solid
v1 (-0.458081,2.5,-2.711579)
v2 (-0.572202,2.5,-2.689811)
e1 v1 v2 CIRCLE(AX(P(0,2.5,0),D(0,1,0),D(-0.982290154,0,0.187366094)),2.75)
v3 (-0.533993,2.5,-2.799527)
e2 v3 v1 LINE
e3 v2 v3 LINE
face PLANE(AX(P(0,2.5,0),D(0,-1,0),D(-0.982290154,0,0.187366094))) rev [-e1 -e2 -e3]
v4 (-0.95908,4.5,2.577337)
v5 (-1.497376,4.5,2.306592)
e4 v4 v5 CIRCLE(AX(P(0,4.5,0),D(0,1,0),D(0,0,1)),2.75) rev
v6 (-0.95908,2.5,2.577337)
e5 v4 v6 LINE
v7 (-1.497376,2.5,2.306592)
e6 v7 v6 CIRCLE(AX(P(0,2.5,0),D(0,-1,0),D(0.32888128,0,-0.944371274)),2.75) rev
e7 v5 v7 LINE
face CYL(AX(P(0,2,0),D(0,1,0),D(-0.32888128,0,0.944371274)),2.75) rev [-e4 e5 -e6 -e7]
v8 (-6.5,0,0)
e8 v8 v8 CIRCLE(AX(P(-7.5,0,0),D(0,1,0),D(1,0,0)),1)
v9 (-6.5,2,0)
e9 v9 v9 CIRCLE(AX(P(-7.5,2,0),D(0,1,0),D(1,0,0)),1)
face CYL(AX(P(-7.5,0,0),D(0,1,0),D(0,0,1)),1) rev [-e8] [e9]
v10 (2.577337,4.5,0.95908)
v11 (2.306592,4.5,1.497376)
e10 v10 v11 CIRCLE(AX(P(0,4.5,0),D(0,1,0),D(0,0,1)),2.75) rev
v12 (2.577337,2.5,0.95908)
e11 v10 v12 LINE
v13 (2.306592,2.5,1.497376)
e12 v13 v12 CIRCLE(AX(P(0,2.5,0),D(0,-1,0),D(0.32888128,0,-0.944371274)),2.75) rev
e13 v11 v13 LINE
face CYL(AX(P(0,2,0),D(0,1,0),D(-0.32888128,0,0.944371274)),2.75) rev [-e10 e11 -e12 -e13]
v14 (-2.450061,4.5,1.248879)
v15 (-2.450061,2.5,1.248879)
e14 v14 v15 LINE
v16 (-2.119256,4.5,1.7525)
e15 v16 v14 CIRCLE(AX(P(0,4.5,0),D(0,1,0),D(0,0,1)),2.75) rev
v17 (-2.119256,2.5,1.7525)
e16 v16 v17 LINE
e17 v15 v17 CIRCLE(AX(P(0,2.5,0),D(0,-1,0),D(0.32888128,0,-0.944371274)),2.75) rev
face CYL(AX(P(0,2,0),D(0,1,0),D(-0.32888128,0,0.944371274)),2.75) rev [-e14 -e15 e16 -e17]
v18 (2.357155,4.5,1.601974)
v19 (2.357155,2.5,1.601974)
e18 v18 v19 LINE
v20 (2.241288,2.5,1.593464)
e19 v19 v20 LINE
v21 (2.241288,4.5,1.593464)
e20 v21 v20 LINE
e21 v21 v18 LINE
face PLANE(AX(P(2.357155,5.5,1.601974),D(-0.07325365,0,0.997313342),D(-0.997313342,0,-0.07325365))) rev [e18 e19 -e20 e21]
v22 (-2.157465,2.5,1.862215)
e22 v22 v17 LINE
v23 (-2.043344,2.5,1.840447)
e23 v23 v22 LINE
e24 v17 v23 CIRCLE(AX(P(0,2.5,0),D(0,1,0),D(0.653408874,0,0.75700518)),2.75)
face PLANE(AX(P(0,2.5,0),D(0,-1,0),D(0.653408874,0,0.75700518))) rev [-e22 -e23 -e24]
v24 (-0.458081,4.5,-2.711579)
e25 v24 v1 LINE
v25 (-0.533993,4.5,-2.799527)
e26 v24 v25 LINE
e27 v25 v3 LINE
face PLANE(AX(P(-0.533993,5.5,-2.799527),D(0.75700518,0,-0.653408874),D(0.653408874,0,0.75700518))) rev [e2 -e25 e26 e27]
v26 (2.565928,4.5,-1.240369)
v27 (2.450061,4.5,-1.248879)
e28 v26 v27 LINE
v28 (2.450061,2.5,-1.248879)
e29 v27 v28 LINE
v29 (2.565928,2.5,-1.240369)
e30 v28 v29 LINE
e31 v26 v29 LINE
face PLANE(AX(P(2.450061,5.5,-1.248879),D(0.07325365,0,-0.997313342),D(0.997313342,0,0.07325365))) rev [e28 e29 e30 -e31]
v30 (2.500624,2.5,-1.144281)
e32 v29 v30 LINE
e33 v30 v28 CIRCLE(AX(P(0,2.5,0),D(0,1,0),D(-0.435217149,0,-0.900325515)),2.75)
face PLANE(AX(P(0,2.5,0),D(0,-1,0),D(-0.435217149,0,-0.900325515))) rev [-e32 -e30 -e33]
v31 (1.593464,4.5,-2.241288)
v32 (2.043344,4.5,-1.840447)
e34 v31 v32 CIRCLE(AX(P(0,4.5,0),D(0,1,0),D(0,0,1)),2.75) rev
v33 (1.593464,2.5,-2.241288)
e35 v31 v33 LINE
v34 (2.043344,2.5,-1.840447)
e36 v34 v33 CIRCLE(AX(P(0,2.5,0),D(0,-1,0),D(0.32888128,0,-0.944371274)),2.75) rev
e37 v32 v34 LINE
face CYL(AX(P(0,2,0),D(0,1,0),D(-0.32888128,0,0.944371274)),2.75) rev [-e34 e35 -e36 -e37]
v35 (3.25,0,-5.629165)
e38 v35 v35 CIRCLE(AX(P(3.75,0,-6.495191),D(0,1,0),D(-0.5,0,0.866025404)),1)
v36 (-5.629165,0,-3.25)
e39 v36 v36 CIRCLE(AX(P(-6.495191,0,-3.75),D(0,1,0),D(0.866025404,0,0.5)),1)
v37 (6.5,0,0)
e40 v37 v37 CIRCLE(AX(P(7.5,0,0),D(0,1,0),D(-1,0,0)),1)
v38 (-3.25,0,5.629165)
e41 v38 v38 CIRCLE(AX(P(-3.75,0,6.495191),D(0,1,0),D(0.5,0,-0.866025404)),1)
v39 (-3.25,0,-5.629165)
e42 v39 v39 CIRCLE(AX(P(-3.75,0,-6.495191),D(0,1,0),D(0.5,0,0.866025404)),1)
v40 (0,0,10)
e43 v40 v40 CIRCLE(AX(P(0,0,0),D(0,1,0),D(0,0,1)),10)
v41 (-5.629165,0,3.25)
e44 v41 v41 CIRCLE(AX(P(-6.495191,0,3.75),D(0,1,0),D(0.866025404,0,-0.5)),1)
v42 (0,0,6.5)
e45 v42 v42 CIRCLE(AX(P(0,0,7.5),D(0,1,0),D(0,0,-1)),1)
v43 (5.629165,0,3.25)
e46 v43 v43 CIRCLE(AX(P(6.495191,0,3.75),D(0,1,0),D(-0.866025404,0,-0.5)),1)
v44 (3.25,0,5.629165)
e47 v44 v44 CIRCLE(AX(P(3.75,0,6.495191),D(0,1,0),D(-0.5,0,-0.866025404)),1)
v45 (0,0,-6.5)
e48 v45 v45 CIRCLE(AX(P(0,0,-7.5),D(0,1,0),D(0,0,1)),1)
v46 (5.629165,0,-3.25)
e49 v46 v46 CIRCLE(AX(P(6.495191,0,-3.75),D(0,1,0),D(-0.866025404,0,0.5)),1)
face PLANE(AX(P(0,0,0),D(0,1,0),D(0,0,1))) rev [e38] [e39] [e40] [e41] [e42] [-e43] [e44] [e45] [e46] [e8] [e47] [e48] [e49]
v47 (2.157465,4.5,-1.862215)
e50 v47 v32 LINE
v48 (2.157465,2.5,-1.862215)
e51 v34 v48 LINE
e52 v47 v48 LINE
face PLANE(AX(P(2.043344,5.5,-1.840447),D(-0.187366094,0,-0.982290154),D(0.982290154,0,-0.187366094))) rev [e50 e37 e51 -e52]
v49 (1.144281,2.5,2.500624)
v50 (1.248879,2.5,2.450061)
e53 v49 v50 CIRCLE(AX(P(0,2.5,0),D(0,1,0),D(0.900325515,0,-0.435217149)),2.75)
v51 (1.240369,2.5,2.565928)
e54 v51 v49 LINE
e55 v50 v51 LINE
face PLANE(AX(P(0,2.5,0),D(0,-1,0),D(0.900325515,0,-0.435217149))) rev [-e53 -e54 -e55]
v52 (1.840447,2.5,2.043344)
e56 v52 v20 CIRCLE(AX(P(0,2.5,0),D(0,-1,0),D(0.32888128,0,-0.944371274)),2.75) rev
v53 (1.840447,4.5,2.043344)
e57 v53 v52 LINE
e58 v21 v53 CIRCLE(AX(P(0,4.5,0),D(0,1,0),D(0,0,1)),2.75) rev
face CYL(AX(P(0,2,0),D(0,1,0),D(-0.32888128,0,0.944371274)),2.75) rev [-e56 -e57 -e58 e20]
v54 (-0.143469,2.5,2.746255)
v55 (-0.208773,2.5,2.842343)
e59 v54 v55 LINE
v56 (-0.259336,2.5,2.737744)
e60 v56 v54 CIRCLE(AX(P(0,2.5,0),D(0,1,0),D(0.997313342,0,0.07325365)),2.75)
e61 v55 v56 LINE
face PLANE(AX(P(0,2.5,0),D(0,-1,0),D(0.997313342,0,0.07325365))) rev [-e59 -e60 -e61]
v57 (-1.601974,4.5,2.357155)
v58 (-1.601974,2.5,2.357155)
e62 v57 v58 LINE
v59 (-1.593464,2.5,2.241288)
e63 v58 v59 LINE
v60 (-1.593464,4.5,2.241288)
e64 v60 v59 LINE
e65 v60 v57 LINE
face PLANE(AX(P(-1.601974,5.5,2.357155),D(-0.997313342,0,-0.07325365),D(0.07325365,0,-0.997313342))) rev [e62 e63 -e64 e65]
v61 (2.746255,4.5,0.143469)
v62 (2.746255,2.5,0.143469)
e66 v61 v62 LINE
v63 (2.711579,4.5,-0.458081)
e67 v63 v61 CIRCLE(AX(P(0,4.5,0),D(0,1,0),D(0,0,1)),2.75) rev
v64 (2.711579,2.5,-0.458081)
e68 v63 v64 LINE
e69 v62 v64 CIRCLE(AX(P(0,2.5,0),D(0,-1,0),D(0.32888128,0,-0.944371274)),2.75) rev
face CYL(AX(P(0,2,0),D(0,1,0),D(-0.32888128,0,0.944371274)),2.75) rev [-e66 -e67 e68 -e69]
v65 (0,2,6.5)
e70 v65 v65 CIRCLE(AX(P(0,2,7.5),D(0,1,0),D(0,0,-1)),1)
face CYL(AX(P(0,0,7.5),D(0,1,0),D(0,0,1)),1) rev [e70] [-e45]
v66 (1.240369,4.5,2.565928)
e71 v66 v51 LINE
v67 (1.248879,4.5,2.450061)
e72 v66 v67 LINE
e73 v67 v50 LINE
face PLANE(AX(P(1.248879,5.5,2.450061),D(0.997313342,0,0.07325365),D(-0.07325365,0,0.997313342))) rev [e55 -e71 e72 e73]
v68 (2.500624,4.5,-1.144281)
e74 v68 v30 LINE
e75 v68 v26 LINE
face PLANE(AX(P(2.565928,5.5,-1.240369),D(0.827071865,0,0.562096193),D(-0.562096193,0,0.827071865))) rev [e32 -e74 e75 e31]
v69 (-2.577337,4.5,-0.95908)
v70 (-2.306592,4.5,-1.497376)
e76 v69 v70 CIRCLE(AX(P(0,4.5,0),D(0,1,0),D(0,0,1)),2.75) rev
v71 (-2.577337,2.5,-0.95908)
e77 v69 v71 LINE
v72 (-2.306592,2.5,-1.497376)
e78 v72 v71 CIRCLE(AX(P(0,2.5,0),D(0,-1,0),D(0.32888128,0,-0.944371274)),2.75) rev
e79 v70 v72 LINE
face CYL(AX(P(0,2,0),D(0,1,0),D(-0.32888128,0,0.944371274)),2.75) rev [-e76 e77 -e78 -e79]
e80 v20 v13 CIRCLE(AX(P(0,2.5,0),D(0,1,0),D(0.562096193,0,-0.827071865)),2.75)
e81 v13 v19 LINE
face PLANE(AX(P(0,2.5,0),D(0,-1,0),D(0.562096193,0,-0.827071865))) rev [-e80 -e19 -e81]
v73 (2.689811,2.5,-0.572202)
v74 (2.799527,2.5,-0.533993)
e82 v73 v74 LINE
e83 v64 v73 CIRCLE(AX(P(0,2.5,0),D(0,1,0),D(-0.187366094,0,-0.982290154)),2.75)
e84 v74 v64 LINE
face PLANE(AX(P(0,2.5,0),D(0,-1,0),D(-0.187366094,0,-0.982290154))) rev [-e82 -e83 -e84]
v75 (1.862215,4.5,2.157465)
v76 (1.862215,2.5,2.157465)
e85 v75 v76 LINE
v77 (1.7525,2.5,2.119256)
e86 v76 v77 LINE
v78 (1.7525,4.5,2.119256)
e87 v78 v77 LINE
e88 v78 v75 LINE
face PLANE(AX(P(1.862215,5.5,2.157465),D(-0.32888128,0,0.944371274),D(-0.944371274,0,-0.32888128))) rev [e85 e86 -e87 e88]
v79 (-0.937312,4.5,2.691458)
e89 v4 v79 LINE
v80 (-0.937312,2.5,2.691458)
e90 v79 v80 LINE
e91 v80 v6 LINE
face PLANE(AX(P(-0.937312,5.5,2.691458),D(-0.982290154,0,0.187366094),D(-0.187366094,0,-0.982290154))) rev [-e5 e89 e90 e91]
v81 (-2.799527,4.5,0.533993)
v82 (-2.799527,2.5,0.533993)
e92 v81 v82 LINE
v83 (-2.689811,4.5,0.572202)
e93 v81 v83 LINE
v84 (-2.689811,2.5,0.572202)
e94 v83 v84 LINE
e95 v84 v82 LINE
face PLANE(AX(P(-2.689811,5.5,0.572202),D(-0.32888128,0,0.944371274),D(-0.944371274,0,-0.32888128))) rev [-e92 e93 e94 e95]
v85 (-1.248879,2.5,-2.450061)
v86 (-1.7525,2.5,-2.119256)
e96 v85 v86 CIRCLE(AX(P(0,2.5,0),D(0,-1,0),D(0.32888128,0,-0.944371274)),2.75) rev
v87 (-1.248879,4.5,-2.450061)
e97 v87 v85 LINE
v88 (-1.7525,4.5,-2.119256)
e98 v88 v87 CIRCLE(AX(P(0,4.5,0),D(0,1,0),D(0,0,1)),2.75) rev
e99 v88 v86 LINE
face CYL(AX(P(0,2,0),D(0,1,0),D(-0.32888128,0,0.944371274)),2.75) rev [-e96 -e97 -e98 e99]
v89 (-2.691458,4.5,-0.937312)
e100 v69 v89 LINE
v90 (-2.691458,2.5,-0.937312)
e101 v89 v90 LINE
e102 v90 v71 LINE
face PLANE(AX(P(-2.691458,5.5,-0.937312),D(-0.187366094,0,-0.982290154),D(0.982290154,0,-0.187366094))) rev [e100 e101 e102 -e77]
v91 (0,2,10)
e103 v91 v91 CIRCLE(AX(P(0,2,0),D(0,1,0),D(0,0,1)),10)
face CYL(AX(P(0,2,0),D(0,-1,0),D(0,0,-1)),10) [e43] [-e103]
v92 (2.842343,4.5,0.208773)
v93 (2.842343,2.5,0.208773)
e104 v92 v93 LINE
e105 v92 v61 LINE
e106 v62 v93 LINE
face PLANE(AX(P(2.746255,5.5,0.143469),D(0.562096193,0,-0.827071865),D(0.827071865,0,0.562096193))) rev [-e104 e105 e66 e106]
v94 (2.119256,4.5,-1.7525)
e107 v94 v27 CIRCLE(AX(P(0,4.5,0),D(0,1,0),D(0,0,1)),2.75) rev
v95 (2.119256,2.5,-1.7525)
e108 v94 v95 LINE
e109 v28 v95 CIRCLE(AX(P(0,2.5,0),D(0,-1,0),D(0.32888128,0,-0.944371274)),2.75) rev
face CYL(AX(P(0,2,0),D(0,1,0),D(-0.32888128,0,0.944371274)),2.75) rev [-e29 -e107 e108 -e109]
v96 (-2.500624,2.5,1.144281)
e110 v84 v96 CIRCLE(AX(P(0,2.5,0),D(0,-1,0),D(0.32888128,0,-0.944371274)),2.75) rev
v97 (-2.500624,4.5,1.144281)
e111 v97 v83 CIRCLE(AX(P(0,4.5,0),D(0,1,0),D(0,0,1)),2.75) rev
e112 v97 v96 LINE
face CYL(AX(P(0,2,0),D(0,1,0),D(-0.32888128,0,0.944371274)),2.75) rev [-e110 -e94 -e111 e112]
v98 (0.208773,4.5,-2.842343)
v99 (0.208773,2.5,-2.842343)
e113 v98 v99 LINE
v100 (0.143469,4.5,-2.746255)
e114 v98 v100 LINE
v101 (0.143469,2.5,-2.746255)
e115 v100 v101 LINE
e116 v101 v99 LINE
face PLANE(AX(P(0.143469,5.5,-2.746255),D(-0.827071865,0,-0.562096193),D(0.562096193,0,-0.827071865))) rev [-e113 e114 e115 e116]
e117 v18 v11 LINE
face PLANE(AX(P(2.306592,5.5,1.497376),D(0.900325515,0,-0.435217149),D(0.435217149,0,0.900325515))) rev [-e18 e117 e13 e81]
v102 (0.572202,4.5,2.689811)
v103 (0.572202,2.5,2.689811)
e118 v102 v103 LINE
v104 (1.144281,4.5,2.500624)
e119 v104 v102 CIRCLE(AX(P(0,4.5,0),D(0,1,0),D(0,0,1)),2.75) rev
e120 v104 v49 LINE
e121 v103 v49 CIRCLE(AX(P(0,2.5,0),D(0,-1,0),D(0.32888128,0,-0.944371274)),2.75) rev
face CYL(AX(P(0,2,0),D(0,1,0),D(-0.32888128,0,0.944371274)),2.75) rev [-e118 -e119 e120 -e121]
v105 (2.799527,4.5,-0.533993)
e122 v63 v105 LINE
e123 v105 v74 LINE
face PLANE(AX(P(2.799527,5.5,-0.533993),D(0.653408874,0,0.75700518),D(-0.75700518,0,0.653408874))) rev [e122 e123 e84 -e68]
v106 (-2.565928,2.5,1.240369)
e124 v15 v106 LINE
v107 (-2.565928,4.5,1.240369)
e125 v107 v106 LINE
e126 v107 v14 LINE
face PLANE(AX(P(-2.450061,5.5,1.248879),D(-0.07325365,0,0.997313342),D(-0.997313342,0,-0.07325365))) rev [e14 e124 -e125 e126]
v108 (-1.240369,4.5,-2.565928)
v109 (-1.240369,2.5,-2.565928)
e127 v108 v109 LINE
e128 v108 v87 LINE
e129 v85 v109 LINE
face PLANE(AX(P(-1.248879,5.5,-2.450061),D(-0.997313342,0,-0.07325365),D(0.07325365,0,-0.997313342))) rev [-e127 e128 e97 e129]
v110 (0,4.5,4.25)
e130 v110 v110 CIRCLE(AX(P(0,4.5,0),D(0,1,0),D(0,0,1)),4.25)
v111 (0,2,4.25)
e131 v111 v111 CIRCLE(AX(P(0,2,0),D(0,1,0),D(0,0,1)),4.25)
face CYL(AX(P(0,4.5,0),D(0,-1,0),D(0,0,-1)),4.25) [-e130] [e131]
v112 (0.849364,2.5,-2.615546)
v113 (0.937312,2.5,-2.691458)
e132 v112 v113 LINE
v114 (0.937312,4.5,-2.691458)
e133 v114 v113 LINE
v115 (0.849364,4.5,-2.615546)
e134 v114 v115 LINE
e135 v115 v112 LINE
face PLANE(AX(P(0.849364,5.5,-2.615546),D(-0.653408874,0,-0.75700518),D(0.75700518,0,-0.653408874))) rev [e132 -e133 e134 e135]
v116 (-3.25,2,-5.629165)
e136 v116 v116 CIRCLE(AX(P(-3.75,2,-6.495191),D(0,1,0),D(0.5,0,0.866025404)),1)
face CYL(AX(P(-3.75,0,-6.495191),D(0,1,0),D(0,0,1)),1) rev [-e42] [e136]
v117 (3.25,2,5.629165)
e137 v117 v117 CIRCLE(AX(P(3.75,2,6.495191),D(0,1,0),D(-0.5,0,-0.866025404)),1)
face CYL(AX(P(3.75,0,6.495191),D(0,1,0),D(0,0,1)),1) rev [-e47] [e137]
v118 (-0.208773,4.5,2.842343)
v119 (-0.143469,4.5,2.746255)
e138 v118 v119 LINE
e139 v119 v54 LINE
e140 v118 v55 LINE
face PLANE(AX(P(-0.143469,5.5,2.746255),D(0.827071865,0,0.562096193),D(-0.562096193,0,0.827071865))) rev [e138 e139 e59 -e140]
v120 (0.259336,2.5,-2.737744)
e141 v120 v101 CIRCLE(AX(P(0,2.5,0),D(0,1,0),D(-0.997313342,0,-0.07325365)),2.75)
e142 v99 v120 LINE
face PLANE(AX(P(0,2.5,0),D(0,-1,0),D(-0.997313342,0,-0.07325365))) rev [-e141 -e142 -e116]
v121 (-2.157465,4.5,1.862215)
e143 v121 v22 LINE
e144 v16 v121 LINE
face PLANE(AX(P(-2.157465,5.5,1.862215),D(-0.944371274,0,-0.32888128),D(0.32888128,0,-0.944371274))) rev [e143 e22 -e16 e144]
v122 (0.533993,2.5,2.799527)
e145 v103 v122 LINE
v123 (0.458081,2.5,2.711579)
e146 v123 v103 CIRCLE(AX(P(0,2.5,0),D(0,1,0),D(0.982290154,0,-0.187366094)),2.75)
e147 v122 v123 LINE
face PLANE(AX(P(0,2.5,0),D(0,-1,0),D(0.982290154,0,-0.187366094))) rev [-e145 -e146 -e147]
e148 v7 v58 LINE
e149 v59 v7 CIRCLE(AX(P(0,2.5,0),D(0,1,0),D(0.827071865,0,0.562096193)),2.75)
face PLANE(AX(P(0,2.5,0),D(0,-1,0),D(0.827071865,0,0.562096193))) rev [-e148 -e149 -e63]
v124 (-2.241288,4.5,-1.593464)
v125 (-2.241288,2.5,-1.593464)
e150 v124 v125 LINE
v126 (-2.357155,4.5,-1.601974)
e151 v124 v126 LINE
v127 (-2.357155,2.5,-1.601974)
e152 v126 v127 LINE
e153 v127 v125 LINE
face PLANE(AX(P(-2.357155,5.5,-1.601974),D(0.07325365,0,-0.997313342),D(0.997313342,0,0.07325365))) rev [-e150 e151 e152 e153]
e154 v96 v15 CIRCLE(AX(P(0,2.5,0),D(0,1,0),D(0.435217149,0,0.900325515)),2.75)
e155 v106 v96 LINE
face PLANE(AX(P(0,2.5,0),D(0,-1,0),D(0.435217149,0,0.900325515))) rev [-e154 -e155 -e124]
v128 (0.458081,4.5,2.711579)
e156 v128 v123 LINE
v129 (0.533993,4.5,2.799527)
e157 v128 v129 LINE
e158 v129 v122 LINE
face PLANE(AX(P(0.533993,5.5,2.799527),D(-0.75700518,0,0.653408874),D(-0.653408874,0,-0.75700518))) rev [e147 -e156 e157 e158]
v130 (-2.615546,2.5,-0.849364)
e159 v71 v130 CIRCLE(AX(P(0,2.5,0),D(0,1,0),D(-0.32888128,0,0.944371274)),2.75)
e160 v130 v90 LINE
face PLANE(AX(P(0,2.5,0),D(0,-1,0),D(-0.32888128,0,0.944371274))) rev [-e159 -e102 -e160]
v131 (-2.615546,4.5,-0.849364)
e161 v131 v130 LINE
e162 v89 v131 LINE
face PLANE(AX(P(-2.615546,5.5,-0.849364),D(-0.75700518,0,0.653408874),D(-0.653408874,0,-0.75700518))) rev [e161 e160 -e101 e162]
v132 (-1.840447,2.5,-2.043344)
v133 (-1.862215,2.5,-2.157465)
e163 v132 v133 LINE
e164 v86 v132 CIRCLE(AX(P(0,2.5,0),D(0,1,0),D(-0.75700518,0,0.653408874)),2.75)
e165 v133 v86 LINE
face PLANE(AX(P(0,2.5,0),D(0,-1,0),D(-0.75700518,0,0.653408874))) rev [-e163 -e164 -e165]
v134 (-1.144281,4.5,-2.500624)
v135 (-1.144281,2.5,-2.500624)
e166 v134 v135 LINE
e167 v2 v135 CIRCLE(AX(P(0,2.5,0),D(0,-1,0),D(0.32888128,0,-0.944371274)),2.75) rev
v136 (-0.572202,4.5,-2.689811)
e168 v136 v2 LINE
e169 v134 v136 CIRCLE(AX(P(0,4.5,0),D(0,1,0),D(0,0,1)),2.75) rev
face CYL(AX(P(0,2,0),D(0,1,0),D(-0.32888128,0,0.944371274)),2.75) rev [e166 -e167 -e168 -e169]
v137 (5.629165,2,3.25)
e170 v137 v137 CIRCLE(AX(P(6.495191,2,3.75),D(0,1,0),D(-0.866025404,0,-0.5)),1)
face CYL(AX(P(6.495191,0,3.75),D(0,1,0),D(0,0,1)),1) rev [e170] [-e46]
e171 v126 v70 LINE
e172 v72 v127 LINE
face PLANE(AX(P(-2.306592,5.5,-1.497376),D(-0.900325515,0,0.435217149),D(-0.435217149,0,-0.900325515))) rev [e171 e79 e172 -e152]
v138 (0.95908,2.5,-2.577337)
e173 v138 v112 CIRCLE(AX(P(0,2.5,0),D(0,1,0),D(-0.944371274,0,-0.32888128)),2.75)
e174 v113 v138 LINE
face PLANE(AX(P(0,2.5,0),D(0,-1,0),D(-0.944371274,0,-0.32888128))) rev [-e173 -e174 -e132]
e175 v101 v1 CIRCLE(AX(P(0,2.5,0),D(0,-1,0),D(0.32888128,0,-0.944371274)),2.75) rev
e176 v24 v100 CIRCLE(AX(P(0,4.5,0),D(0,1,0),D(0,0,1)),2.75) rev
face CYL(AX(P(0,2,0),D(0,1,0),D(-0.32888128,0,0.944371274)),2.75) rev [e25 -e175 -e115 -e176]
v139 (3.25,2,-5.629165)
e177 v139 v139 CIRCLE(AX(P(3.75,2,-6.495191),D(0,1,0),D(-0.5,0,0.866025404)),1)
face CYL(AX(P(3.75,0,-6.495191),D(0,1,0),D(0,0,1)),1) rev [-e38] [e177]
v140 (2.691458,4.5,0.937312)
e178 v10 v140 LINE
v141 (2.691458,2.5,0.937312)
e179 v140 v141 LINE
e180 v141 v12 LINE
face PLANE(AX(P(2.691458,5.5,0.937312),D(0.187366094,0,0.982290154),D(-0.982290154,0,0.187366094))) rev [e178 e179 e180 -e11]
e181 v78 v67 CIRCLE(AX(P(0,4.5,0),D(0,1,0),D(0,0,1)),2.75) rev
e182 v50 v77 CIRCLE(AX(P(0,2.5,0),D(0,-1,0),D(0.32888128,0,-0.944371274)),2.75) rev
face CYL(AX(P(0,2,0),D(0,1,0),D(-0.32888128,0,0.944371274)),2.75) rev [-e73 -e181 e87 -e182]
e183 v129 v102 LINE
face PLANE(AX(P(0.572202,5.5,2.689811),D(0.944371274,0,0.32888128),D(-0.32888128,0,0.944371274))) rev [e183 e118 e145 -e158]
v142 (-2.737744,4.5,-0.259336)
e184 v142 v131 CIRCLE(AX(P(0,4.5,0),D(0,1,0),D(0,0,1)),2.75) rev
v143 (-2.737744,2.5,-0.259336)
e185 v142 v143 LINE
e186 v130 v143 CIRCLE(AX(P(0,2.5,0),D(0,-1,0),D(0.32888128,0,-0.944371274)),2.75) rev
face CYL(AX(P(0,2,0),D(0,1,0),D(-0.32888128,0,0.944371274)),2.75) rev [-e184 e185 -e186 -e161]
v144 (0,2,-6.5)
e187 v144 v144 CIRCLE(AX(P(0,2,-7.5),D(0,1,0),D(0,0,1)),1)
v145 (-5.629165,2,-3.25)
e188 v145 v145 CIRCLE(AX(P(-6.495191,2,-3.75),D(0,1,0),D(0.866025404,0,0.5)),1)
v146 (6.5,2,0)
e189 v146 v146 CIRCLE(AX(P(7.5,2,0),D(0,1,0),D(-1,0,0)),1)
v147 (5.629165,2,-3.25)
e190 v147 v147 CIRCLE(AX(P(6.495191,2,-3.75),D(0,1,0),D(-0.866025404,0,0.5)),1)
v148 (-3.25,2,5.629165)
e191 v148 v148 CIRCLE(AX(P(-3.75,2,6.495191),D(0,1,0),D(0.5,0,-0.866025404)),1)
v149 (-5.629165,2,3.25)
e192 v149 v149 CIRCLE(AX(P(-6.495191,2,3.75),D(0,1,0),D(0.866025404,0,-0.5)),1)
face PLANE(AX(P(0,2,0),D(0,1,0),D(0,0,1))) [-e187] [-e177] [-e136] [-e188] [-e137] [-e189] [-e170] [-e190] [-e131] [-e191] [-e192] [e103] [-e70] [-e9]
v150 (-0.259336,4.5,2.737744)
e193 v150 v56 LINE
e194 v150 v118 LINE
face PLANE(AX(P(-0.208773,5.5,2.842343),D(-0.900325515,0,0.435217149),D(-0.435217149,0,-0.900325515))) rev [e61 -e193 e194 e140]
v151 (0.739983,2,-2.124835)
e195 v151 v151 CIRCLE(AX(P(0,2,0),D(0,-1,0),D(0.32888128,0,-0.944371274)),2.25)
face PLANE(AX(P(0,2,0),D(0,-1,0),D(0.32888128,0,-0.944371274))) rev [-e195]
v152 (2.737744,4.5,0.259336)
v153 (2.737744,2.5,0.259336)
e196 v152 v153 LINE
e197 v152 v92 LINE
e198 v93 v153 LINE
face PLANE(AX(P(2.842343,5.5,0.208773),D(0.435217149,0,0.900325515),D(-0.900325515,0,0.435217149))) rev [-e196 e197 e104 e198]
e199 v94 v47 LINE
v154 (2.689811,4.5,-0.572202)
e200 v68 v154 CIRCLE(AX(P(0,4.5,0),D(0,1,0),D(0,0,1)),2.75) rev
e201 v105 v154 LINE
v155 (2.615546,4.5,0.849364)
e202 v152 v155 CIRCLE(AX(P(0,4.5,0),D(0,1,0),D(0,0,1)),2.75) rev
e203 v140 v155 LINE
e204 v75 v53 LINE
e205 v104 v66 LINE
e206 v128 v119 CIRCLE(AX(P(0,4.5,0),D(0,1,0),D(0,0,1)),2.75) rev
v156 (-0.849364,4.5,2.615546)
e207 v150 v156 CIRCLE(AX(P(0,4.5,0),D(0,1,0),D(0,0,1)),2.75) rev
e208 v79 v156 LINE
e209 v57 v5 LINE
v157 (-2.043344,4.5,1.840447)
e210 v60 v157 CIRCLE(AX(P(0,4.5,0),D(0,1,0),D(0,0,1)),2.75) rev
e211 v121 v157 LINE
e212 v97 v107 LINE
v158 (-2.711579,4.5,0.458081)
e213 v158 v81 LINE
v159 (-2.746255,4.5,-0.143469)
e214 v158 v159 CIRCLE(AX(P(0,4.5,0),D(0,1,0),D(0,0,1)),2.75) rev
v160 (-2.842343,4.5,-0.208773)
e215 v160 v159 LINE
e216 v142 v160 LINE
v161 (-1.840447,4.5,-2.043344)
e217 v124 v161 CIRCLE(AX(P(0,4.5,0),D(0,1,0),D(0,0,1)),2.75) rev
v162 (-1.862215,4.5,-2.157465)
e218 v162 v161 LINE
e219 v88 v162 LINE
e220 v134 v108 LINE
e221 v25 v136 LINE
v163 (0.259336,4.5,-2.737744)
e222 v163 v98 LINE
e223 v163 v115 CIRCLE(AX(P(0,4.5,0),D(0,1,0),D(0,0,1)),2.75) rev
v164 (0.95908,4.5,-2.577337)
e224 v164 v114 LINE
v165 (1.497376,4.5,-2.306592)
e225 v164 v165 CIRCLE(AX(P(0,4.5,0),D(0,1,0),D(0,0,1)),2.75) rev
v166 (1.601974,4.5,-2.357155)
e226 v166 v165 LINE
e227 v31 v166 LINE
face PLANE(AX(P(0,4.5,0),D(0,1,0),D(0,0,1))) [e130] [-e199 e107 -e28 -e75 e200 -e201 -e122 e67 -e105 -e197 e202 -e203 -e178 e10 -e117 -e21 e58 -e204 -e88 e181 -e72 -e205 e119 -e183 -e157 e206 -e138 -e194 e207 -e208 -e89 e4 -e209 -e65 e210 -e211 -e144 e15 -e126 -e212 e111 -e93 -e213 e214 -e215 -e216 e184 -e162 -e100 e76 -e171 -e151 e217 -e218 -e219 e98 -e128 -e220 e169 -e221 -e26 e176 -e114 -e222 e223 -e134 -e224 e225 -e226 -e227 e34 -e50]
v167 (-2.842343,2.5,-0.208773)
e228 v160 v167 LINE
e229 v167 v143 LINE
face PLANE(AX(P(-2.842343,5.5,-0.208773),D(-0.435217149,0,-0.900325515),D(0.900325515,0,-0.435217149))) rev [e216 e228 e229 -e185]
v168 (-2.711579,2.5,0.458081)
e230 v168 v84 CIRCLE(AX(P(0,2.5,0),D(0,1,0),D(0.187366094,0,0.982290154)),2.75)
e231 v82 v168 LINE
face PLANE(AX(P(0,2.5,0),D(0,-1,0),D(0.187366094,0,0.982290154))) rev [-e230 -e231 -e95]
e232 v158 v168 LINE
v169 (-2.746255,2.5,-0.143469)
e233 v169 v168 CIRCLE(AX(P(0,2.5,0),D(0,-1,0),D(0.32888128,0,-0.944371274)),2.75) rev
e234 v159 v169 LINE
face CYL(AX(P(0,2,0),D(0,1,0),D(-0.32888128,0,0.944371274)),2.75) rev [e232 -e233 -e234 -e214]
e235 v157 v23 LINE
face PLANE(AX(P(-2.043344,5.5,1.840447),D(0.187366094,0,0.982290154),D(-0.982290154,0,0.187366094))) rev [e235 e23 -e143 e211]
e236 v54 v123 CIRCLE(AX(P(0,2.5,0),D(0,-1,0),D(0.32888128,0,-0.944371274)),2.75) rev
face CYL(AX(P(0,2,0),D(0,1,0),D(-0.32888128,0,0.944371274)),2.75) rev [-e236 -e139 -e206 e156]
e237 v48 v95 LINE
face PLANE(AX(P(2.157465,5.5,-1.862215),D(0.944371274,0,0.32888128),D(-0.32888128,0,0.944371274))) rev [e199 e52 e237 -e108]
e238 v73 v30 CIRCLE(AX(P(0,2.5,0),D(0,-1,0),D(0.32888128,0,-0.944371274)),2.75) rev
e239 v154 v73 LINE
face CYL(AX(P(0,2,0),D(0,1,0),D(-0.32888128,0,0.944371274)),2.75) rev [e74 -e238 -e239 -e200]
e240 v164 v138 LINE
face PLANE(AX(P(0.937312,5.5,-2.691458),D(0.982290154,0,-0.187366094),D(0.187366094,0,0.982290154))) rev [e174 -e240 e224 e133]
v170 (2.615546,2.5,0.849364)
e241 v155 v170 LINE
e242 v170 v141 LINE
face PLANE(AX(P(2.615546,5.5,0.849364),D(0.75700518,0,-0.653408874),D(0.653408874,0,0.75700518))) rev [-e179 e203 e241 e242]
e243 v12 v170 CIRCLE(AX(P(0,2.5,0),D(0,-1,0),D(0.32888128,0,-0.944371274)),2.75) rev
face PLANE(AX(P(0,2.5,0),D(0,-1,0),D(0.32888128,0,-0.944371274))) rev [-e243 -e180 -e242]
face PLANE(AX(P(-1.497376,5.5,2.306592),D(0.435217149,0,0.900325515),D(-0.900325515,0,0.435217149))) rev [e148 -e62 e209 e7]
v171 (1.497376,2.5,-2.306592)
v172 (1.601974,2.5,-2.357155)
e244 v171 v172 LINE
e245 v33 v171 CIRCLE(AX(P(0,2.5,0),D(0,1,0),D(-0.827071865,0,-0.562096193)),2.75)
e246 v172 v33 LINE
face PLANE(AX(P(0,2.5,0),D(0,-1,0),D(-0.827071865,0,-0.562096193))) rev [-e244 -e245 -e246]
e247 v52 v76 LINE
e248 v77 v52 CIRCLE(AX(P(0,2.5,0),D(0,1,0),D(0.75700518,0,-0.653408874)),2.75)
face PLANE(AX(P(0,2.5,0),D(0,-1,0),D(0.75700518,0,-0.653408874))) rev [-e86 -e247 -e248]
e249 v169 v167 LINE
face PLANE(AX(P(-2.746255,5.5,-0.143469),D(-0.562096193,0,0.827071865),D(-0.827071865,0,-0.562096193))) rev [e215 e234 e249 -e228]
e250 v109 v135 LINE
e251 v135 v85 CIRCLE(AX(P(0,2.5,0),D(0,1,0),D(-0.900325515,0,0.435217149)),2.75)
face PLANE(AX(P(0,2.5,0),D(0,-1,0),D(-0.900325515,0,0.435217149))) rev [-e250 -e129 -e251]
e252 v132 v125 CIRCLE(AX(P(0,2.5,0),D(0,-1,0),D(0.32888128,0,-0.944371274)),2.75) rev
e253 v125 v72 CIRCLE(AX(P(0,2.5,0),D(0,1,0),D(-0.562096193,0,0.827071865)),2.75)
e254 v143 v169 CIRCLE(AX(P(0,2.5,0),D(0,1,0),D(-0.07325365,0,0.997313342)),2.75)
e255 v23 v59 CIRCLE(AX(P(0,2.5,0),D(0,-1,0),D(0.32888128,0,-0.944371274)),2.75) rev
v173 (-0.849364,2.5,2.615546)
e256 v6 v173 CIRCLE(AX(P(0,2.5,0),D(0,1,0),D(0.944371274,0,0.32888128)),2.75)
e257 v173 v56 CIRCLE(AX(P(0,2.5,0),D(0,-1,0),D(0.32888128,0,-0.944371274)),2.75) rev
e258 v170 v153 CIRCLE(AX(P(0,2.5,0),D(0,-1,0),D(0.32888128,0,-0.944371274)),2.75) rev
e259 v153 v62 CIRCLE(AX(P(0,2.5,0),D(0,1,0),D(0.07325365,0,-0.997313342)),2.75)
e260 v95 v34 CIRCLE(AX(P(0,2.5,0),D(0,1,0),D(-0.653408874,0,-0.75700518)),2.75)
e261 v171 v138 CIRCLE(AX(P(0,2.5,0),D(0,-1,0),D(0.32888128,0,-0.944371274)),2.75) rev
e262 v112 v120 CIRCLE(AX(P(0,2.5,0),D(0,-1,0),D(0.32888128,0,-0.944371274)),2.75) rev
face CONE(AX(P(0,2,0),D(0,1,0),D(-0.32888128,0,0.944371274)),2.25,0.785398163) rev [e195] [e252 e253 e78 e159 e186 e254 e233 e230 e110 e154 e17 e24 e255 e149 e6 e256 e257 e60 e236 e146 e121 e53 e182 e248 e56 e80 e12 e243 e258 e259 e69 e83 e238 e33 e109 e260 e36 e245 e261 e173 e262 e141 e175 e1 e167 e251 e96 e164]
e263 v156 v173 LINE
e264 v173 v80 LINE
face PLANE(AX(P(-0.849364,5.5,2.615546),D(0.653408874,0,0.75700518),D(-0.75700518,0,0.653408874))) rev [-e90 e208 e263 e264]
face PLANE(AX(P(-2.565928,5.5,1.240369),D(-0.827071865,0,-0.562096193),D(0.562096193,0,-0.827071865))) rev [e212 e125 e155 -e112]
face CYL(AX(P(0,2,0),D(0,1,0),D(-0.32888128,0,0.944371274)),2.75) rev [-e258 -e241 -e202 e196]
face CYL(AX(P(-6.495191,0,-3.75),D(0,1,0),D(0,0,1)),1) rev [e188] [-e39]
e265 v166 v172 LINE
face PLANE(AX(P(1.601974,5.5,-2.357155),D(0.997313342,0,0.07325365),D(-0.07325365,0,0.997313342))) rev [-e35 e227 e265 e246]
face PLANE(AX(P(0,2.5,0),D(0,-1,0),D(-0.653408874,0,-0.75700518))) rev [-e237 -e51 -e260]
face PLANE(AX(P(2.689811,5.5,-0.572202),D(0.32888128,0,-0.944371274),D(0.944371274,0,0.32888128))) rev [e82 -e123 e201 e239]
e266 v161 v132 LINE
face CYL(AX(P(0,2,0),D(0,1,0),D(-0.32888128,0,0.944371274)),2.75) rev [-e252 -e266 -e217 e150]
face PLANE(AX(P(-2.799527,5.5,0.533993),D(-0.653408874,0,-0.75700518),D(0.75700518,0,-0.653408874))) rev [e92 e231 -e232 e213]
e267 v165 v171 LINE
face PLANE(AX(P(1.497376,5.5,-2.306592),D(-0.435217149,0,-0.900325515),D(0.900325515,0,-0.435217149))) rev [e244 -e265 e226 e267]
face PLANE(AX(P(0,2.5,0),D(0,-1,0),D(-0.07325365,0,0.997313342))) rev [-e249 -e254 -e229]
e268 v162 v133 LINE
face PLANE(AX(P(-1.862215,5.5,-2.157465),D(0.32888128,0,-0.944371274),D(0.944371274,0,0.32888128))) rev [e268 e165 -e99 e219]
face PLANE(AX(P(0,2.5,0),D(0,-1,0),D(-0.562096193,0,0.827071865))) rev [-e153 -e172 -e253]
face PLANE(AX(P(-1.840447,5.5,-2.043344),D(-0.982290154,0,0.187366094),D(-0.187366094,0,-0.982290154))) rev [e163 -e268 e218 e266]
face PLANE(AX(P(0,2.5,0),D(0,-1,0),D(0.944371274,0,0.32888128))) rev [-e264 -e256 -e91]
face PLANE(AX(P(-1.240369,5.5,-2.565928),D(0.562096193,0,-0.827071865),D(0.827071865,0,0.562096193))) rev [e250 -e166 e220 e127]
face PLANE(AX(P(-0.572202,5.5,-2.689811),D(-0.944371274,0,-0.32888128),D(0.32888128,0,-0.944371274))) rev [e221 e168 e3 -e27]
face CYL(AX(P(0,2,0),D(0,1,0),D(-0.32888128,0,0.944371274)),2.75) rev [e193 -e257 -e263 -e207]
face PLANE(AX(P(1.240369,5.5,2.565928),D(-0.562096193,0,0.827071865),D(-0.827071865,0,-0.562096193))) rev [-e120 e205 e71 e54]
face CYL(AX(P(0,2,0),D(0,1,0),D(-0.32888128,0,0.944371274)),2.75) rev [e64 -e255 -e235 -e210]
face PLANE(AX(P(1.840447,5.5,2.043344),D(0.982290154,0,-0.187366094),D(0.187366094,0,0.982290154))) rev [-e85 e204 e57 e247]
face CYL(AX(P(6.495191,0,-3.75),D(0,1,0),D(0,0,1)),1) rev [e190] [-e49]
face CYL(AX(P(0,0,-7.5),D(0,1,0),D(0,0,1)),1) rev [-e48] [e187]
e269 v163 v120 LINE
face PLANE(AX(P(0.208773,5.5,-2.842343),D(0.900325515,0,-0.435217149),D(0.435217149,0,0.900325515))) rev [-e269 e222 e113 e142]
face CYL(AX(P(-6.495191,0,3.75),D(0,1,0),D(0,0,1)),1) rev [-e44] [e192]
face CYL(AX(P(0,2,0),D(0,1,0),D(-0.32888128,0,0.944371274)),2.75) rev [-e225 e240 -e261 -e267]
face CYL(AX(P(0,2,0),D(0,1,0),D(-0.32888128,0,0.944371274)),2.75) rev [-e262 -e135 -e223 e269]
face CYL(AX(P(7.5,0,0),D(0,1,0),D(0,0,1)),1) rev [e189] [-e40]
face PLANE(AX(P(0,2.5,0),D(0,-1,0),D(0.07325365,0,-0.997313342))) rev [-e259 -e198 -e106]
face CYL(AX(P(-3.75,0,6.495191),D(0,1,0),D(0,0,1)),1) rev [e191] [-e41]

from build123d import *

# Parameters (mm, degrees)
SKETCH1_R           = 10
BOSS_EXTRUDE1_DEPTH = 2
SKETCH2_R           = 4.25
BOSS_EXTRUDE2_DEPTH = 2.5
CAVITY4_START       = 2.5
CAVITY4_DEPTH       = 2
SKETCH3_R           = 1
CUT_EXTRUDE1_DEPTH  = 15.361406616
CIRPATTERN1_COUNT   = 12


with BuildPart() as part:
    # Sketch1 → Boss-Extrude1 (new body)
    with BuildSketch(Plane(origin=(0, 0, 0), x_dir=(1, 0, 0), z_dir=(0, 1, 0))):
        with Locations(Location((0, 0, 0), (0, 0, 270))):
            Circle(SKETCH1_R)
    extrude(amount=BOSS_EXTRUDE1_DEPTH)

    # Sketch2 → Boss-Extrude2 (add)
    with BuildSketch(Plane(origin=(0, 2, 0), x_dir=(1, 0, 0), z_dir=(0, 1, 0))):
        with Locations(Location((0, 0, 0), (0, 0, 270))):
            Circle(SKETCH2_R)
    extrude(amount=BOSS_EXTRUDE2_DEPTH)

    # Cavity4: read off the stored shape, not the designer's step
    # Cavity4 outline → Cavity4 (cut)
    with BuildSketch(Plane(origin=(0, 0, 0), x_dir=(1, 0, 0), z_dir=(0, 1, 0)).offset(CAVITY4_START)):
        with BuildLine():
            Line((-0.937311647, -2.691458132), (-0.849363871, -2.615546026))
            ThreePointArc((-0.849363871, -2.615546026), (-0.557706787, -2.692854088), (-0.259335807, -2.737744498))
            Line((-0.259335807, -2.737744498), (-0.208772903, -2.842343026))
            Line((-0.208772903, -2.842343026), (-0.143469374, -2.746255003))
            ThreePointArc((-0.143469374, -2.746255003), (0.158258534, -2.745442448), (0.458081263, -2.711579163))
            Line((0.458081263, -2.711579163), (0.533993369, -2.799526939))
            Line((0.533993369, -2.799526939), (0.572202324, -2.689811239))
            ThreePointArc((0.572202324, -2.689811239), (0.863438798, -2.610933443), (1.144280852, -2.500624188))
            Line((1.144280852, -2.500624188), (1.240368875, -2.565927718))
            Line((1.240368875, -2.565927718), (1.248879379, -2.450061284))
            ThreePointArc((1.248879379, -2.450061284), (1.509777135, -2.298493638), (1.752499592, -2.119255808))
            Line((1.752499592, -2.119255808), (1.862215292, -2.157464763))
            Line((1.862215292, -2.157464763), (1.840447368, -2.043343702))
            ThreePointArc((1.840447368, -2.043343702), (2.053226655, -1.82941529), (2.241288381, -1.593463647))
            Line((2.241288381, -1.593463647), (2.357154815, -1.601974151))
            Line((2.357154815, -1.601974151), (2.306591911, -1.497375623))
            ThreePointArc((2.306591911, -1.497375623), (2.456752172, -1.235665313), (2.577337071, -0.959079571))
            Line((2.577337071, -0.959079571), (2.691458132, -0.937311647))
            Line((2.691458132, -0.937311647), (2.615546026, -0.849363871))
            ThreePointArc((2.615546026, -0.849363871), (2.692854088, -0.557706787), (2.737744498, -0.259335807))
            Line((2.737744498, -0.259335807), (2.842343026, -0.208772903))
            Line((2.842343026, -0.208772903), (2.746255003, -0.143469374))
            ThreePointArc((2.746255003, -0.143469374), (2.745442448, 0.158258534), (2.711579163, 0.458081263))
            Line((2.711579163, 0.458081263), (2.799526939, 0.533993369))
            Line((2.799526939, 0.533993369), (2.689811239, 0.572202324))
            ThreePointArc((2.689811239, 0.572202324), (2.610933443, 0.863438798), (2.500624188, 1.144280852))
            Line((2.500624188, 1.144280852), (2.565927718, 1.240368875))
            Line((2.565927718, 1.240368875), (2.450061284, 1.248879379))
            ThreePointArc((2.450061284, 1.248879379), (2.298493638, 1.509777135), (2.119255808, 1.752499592))
            Line((2.119255808, 1.752499592), (2.157464763, 1.862215292))
            Line((2.157464763, 1.862215292), (2.043343702, 1.840447368))
            ThreePointArc((2.043343702, 1.840447368), (1.82941529, 2.053226655), (1.593463647, 2.241288381))
            Line((1.593463647, 2.241288381), (1.601974151, 2.357154815))
            Line((1.601974151, 2.357154815), (1.497375623, 2.306591911))
            ThreePointArc((1.497375623, 2.306591911), (1.235665313, 2.456752172), (0.959079571, 2.577337071))
            Line((0.959079571, 2.577337071), (0.937311647, 2.691458132))
            Line((0.937311647, 2.691458132), (0.849363871, 2.615546026))
            ThreePointArc((0.849363871, 2.615546026), (0.557706787, 2.692854088), (0.259335807, 2.737744498))
            Line((0.259335807, 2.737744498), (0.208772903, 2.842343026))
            Line((0.208772903, 2.842343026), (0.143469374, 2.746255003))
            ThreePointArc((0.143469374, 2.746255003), (-0.158258534, 2.745442448), (-0.458081263, 2.711579163))
            Line((-0.458081263, 2.711579163), (-0.533993369, 2.799526939))
            Line((-0.533993369, 2.799526939), (-0.572202324, 2.689811239))
            ThreePointArc((-0.572202324, 2.689811239), (-0.863438798, 2.610933443), (-1.144280852, 2.500624188))
            Line((-1.144280852, 2.500624188), (-1.240368875, 2.565927718))
            Line((-1.240368875, 2.565927718), (-1.248879379, 2.450061284))
            ThreePointArc((-1.248879379, 2.450061284), (-1.509777135, 2.298493638), (-1.752499592, 2.119255808))
            Line((-1.752499592, 2.119255808), (-1.862215292, 2.157464763))
            Line((-1.862215292, 2.157464763), (-1.840447368, 2.043343702))
            ThreePointArc((-1.840447368, 2.043343702), (-2.053226655, 1.82941529), (-2.241288381, 1.593463647))
            Line((-2.241288381, 1.593463647), (-2.357154815, 1.601974151))
            Line((-2.357154815, 1.601974151), (-2.306591911, 1.497375623))
            ThreePointArc((-2.306591911, 1.497375623), (-2.456752172, 1.235665313), (-2.577337071, 0.959079571))
            Line((-2.577337071, 0.959079571), (-2.691458132, 0.937311647))
            Line((-2.691458132, 0.937311647), (-2.615546026, 0.849363871))
            ThreePointArc((-2.615546026, 0.849363871), (-2.692854088, 0.557706787), (-2.737744498, 0.259335807))
            Line((-2.737744498, 0.259335807), (-2.842343026, 0.208772903))
            Line((-2.842343026, 0.208772903), (-2.746255003, 0.143469374))
            ThreePointArc((-2.746255003, 0.143469374), (-2.745442448, -0.158258534), (-2.711579163, -0.458081263))
            Line((-2.711579163, -0.458081263), (-2.799526939, -0.533993369))
            Line((-2.799526939, -0.533993369), (-2.689811239, -0.572202324))
            ThreePointArc((-2.689811239, -0.572202324), (-2.610933443, -0.863438798), (-2.500624188, -1.144280852))
            Line((-2.500624188, -1.144280852), (-2.565927718, -1.240368875))
            Line((-2.565927718, -1.240368875), (-2.450061284, -1.248879379))
            ThreePointArc((-2.450061284, -1.248879379), (-2.298493638, -1.509777135), (-2.119255808, -1.752499592))
            Line((-2.119255808, -1.752499592), (-2.157464763, -1.862215292))
            Line((-2.157464763, -1.862215292), (-2.043343702, -1.840447368))
            ThreePointArc((-2.043343702, -1.840447368), (-1.82941529, -2.053226655), (-1.593463647, -2.241288381))
            Line((-1.593463647, -2.241288381), (-1.601974151, -2.357154815))
            Line((-1.601974151, -2.357154815), (-1.497375623, -2.306591911))
            ThreePointArc((-1.497375623, -2.306591911), (-1.235665313, -2.456752172), (-0.959079571, -2.577337071))
            Line((-0.959079571, -2.577337071), (-0.937311647, -2.691458132))
        make_face()
    extrude(amount=CAVITY4_DEPTH, mode=Mode.SUBTRACT)

    # Cavity4 2 outline → Cavity4 2 (revolve, cut)
    with BuildSketch(Plane.XY):
        Polygon((0, 2.5), (0, 2), (2.25, 2), (2.75, 2.5), align=None)
    revolve(axis=Axis((0, 0, 0), (0, 1, 0)), mode=Mode.SUBTRACT)

    # Sketch3 → Cut-Extrude1 (cut, through all)
    with BuildSketch(Plane(origin=(0, 2, 0), x_dir=(1, 0, 0), z_dir=(0, 1, 0))):
        with Locations(Location((0, 7.5, 0), (0, 0, 270))):
            Circle(SKETCH3_R)
    cut_extrude1 = extrude(amount=-CUT_EXTRUDE1_DEPTH, mode=Mode.SUBTRACT)

    # CirPattern1: Cut-Extrude1 ×12 about axis
    cirpattern1_axis = Axis((0, 0, 0), (0, 1, 0))
    for i in range(1, CIRPATTERN1_COUNT):
        add(cut_extrude1.rotate(cirpattern1_axis, i * 360 / CIRPATTERN1_COUNT), mode=Mode.SUBTRACT)


solid = part.part
